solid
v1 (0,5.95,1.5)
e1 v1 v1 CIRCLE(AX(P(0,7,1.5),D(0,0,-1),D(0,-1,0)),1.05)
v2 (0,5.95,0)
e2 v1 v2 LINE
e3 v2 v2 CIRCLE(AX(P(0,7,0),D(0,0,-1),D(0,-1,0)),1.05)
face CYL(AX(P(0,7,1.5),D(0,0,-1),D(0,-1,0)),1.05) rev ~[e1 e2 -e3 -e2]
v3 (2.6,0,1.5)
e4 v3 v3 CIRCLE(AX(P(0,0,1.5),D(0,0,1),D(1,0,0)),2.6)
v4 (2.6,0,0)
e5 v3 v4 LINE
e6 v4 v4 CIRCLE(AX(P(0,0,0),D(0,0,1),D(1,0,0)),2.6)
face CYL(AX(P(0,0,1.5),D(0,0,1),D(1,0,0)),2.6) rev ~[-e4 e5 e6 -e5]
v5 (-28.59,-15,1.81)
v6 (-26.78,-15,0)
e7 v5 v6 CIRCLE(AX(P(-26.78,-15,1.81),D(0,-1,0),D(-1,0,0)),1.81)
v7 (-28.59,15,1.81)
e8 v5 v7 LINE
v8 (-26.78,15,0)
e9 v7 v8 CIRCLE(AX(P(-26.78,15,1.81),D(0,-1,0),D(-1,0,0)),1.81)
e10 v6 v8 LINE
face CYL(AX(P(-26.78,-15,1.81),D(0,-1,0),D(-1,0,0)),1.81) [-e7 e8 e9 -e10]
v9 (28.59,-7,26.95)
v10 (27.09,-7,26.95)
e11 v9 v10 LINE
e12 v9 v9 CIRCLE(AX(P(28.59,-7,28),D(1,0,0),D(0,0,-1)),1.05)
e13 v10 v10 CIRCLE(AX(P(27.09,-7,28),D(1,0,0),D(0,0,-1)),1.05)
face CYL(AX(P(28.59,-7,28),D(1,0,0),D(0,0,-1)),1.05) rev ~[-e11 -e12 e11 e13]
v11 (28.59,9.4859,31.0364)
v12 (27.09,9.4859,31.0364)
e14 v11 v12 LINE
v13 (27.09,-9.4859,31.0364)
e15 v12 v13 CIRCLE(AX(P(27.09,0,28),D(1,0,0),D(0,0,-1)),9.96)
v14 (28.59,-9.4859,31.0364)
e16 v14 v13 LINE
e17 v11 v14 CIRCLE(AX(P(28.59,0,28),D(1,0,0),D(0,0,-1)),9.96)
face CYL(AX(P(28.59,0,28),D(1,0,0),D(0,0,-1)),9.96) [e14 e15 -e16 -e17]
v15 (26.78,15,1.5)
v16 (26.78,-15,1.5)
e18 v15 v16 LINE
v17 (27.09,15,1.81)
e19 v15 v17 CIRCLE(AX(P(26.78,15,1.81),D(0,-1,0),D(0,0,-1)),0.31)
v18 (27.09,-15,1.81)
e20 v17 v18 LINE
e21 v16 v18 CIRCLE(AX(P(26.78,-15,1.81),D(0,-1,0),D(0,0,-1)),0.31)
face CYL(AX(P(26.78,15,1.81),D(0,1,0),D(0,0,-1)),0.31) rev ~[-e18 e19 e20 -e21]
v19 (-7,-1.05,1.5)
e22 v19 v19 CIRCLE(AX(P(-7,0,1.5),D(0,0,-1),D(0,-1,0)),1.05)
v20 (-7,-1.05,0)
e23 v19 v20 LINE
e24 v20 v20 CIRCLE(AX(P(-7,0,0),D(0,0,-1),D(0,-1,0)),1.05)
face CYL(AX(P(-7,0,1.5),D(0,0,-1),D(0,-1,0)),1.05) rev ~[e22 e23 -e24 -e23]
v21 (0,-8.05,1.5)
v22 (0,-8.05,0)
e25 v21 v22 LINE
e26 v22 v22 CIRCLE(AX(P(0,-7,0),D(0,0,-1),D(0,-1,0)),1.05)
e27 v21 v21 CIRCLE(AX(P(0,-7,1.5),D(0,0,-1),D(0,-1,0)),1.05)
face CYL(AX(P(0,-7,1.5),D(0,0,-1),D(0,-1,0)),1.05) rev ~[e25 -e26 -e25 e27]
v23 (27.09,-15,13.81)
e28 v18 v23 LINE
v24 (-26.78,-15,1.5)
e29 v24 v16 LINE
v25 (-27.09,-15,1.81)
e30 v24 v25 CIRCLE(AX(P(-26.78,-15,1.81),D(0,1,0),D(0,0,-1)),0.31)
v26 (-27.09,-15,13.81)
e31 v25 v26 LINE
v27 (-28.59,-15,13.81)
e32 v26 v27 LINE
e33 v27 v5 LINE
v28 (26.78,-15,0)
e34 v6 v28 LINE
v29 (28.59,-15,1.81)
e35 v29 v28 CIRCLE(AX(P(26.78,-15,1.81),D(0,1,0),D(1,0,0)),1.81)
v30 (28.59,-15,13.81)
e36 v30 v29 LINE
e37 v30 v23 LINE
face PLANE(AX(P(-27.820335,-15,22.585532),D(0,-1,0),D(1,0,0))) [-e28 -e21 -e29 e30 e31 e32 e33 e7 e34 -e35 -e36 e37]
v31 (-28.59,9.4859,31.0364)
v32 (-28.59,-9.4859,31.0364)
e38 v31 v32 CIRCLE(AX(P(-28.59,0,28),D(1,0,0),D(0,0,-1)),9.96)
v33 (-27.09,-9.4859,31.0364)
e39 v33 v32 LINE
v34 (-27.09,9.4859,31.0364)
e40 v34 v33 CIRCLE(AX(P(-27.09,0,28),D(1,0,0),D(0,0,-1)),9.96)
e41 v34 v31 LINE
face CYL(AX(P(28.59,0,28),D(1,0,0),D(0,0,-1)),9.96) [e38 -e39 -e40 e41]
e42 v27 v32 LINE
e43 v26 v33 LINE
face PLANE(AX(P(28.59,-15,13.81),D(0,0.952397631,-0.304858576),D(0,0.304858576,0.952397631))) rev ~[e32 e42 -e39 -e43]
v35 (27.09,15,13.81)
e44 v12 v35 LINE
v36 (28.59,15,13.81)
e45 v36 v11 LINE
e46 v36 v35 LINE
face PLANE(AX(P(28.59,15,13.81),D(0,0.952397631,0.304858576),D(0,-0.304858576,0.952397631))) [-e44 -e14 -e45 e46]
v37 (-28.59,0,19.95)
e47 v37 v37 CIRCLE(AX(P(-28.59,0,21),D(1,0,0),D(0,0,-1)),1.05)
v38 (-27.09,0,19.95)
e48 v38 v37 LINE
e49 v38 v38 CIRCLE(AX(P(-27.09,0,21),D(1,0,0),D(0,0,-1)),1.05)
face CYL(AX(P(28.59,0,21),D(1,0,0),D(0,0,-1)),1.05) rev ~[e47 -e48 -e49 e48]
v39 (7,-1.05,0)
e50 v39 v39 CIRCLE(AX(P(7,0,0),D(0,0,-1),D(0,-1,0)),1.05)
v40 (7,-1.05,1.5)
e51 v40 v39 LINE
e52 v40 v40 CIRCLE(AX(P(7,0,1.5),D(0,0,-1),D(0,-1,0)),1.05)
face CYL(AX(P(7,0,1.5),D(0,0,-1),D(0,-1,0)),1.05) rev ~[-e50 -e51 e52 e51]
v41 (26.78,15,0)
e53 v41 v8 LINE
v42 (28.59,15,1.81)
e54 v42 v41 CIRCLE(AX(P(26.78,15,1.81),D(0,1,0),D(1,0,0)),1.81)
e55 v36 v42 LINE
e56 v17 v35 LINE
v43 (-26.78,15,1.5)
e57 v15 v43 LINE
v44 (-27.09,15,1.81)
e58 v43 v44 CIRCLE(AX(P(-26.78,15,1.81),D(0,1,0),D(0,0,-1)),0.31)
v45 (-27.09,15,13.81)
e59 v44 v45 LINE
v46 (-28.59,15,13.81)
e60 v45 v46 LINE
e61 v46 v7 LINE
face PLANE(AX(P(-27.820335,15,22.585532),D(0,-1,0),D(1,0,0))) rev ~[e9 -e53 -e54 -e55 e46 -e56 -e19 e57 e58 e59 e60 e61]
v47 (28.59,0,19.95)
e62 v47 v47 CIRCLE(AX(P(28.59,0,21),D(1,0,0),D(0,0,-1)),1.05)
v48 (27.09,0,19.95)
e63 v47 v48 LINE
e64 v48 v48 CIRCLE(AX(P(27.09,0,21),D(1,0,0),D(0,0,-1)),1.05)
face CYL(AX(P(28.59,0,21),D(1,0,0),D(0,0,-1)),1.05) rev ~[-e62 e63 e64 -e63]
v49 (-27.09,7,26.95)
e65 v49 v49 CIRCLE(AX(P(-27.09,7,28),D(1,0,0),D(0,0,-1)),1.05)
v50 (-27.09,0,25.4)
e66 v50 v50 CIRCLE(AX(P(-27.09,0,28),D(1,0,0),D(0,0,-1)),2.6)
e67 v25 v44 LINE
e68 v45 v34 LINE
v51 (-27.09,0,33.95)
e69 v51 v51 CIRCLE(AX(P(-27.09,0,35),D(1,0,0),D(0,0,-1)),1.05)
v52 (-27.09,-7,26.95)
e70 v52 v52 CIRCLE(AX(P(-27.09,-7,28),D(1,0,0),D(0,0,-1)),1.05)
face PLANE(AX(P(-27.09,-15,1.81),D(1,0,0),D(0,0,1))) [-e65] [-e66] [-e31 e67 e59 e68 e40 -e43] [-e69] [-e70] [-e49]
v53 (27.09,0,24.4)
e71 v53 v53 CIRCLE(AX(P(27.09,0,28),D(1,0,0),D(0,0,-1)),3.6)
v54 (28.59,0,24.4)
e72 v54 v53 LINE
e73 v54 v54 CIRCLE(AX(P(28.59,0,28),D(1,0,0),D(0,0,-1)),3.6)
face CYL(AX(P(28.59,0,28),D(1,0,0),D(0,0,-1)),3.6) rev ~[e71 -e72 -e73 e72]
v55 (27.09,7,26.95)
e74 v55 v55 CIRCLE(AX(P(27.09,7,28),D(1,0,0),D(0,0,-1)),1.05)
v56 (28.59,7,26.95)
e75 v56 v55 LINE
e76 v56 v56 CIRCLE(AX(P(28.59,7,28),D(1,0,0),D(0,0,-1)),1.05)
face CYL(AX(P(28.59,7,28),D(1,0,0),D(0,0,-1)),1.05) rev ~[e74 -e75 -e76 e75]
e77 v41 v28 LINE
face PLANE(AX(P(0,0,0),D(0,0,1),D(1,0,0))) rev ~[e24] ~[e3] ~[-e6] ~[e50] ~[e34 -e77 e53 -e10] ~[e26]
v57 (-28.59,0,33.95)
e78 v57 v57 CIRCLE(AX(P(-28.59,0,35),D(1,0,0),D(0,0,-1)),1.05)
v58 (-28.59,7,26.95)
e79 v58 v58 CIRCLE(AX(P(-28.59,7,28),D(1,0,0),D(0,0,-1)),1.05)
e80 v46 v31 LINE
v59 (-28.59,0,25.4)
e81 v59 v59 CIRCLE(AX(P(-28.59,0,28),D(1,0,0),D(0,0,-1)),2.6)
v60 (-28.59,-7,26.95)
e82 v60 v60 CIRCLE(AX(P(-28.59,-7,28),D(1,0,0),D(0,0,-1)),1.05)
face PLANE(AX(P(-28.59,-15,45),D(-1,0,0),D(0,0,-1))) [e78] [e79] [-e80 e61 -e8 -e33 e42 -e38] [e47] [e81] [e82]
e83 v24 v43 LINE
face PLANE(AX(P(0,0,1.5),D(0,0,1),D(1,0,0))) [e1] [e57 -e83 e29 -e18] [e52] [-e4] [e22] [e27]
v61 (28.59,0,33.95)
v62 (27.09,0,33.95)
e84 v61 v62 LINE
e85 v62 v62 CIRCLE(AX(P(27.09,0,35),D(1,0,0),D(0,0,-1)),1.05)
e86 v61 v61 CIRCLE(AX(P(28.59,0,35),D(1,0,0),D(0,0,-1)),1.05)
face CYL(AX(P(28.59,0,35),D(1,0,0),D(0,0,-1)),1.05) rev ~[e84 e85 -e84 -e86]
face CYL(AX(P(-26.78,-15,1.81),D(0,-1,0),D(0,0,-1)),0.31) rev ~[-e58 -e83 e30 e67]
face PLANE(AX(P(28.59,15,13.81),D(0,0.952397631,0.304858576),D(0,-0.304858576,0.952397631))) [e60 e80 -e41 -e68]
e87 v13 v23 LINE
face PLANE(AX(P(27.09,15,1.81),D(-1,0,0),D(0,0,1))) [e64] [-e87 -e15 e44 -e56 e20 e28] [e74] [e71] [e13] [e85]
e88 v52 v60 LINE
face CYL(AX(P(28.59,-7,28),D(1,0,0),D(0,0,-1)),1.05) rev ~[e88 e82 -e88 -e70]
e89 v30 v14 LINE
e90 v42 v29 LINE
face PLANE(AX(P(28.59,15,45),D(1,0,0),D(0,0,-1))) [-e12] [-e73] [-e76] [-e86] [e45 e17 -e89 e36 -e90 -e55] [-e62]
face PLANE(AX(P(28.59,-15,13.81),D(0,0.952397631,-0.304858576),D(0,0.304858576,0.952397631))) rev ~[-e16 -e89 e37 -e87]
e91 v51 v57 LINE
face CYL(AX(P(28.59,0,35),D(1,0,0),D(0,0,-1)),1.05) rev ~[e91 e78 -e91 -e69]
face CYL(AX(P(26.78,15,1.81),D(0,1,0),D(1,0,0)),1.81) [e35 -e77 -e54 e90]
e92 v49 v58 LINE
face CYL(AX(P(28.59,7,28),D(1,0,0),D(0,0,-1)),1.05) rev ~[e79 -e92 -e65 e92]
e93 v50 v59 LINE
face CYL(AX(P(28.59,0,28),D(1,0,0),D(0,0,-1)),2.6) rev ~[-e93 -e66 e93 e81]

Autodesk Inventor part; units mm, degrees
ref_plane "YZ Plane" through (0, 0, 0) normal (1, 0, 0) x (0, 1, 0)
ref_plane "XZ Plane" through (0, 0, 0) normal (0, 1, 0) x (-1, 0, 0)
ref_plane "XY Plane" through (0, 0, 0) normal (0, 0, 1) x (1, 0, 0)
sketch "Sketch1" plane through (0, 0, 0) normal (0, 0, 1) x (1, 0, 0)
  line L0 (-28.59, -15) -> (28.59, -15)
  line L1 (28.59, -15) -> (28.59, 15)
  line L2 (28.59, 15) -> (-28.59, 15)
  line L3 (-28.59, 15) -> (-28.59, -15)
  line L4 (-28.59, -15) -> (28.59, 15) construction
  line L5 (28.59, -15) -> (-28.59, 15) construction
  point P0 (0, 0)
  dimension "d0" = 57.18
  dimension "d1" = 30
extrude "Plate1" add sketch "Sketch1" along normal blind 1.5
sketch "Sketch2" plane through (-27.09, -15, 0) normal (-1, 0, 0) x (0, -1, 0)
  line L0 (-30, 0) -> (0, 0)
  line L1 (0, 0) -> (0, 45)
  line L2 (0, 45) -> (-30, 45)
  line L3 (-30, 45) -> (-30, 0)
edge flange "Flange1" height 45 angle 90 thickness 1.5 bend radius 0.31 thickness toward (-1, 0, 0) relief tear relief width 1.5 relief depth 0.75 corner gap 0.31 corner form 0 edges at (-28.59, 0, 1.5) (28.59, 0, 1.5) wall of the first edge with corners at (-27.09, 15, 0) (-27.09, -15, 0) (-27.09, -15, 45) (-27.09, 15, 45)
bend "Bend1"
corner "Corner1"
sketch "Sketch3" plane through (28.59, -15, 45) normal (1, 0, 0) x (0, 0, -1)
  circle A0 centre (17, 15) radius 9.96
  line L0 (0, 30) -> (43.19, 30) projected
  line L1 (43.19, 0) -> (0, 0) projected
  line L2 (31.19, 30) -> (13.9636, 24.4859)
  line L3 (31.19, 0) -> (13.9636, 5.5141)
  line L4 (0, 30) -> (0, 0)
  point P0 (45, 15)
  dimension "d13" = 19.92
  dimension "d14" = 12
  dimension "d15" = 28
extrude "Cut1" cut sketch "Sketch3" against normal blind 57.18 contours A0 L3 L1 L4 L0 L2
sketch "Sketch4" plane through (0, 0, 1.5) normal (0, 0, 1) x (1, 0, 0)
  circle A0 centre (7, 0) radius 0.7835 projected
  circle A1 centre (0, -7) radius 0.7835 projected
  circle A2 centre (-7, 0) radius 0.7835 projected
  circle A3 centre (0, 7) radius 0.7835 projected
  circle A4 centre (0, 0) radius 2.925 projected
hole "Hole1" at (7, 0, 1.5) at (0, 7, 1.5) at (-7, 0, 1.5) at (0, -7, 1.5) direction (0, 0, -1) diameter 2.1 depth 1.5
sketch "Sketch5" plane through (0, 0, 1.5) normal (0, 0, 1) x (1, 0, 0)
  circle A0 centre (0, 0) radius 1.75 projected
  circle A1 centre (0, 0) radius 2.6
  point P0 (0, 0)
  dimension "d26" = 5.2
extrude "Extrusion1" cut sketch "Sketch5" against normal through all contours A0 | A1
sketch "Sketch12" plane through (28.59, -15, 1.81) normal (1, 0, 0) x (0, 0, -1)
  arc A0 (-29.2264, 24.4859) -> (-29.2264, 5.5141) centre (-26.19, 15) ccw projected
  circle A1 centre (-26.19, 15) radius 2.6
  circle A2 centre (-33.19, 15) radius 1.05
  circle A3 centre (-26.19, 8) radius 1.05
  circle A4 centre (-19.19, 15) radius 1.05
  circle A5 centre (-26.19, 22) radius 1.05
  point P0 (1.81, 15)
  dimension "d52" = 5.2
  dimension "d53" = 2.1
  dimension "d54" = 7
  dimension "d57" = 360
extrude "Cut5" cut sketch "Sketch12" against normal blind 57.18
sketch "Sketch13" plane through (28.59, -15, 1.81) normal (1, 0, 0) x (0, 0, -1)
  circle A0 centre (-26.19, 15) radius 2.6 projected
  circle A1 centre (-26.19, 15) radius 3.6
  point P0 (1.81, 15)
  dimension "d61" = 7.2
extrude "Cut6" cut sketch "Sketch13" against normal blind 1.5
equation "\"d24\" = Thickness"
equation "\"d62\" = Thickness"
equation "\"d2\" = Thickness"
equation "\"d3\" = BendReliefWidth"
equation "\"d4\" = BendReliefDepth"
equation "\"d5\" = MinimumRemnant"
equation "\"d6\" = TransitionRadius"
equation "\"d9\" = BendRadius"
equation "\"d10\" = CornerReliefSize"
equation "\"d11\" = GapSize"
equation "\"d12\" = JacobiRadiusSize"
equation "\"BendReliefWidth\" = Thickness"
equation "\"BendReliefDepth\" = 0.5 * Thickness"
equation "\"CornerReliefSize\" = 4 * Thickness"
equation "\"MinimumRemnant\" = 2 * Thickness"
equation "\"TransitionRadius\" = BendRadius"
equation "\"JacobiRadiusSize\" = BendRadius"
equation "\"GapSize\" = Thickness"
equation "\"Thickness\" = 1.5"
equation "\"BendRadius\" = 0.31"
properties part number "axis_5_bottom_frame" material "Aluminum 6061-AHC"
